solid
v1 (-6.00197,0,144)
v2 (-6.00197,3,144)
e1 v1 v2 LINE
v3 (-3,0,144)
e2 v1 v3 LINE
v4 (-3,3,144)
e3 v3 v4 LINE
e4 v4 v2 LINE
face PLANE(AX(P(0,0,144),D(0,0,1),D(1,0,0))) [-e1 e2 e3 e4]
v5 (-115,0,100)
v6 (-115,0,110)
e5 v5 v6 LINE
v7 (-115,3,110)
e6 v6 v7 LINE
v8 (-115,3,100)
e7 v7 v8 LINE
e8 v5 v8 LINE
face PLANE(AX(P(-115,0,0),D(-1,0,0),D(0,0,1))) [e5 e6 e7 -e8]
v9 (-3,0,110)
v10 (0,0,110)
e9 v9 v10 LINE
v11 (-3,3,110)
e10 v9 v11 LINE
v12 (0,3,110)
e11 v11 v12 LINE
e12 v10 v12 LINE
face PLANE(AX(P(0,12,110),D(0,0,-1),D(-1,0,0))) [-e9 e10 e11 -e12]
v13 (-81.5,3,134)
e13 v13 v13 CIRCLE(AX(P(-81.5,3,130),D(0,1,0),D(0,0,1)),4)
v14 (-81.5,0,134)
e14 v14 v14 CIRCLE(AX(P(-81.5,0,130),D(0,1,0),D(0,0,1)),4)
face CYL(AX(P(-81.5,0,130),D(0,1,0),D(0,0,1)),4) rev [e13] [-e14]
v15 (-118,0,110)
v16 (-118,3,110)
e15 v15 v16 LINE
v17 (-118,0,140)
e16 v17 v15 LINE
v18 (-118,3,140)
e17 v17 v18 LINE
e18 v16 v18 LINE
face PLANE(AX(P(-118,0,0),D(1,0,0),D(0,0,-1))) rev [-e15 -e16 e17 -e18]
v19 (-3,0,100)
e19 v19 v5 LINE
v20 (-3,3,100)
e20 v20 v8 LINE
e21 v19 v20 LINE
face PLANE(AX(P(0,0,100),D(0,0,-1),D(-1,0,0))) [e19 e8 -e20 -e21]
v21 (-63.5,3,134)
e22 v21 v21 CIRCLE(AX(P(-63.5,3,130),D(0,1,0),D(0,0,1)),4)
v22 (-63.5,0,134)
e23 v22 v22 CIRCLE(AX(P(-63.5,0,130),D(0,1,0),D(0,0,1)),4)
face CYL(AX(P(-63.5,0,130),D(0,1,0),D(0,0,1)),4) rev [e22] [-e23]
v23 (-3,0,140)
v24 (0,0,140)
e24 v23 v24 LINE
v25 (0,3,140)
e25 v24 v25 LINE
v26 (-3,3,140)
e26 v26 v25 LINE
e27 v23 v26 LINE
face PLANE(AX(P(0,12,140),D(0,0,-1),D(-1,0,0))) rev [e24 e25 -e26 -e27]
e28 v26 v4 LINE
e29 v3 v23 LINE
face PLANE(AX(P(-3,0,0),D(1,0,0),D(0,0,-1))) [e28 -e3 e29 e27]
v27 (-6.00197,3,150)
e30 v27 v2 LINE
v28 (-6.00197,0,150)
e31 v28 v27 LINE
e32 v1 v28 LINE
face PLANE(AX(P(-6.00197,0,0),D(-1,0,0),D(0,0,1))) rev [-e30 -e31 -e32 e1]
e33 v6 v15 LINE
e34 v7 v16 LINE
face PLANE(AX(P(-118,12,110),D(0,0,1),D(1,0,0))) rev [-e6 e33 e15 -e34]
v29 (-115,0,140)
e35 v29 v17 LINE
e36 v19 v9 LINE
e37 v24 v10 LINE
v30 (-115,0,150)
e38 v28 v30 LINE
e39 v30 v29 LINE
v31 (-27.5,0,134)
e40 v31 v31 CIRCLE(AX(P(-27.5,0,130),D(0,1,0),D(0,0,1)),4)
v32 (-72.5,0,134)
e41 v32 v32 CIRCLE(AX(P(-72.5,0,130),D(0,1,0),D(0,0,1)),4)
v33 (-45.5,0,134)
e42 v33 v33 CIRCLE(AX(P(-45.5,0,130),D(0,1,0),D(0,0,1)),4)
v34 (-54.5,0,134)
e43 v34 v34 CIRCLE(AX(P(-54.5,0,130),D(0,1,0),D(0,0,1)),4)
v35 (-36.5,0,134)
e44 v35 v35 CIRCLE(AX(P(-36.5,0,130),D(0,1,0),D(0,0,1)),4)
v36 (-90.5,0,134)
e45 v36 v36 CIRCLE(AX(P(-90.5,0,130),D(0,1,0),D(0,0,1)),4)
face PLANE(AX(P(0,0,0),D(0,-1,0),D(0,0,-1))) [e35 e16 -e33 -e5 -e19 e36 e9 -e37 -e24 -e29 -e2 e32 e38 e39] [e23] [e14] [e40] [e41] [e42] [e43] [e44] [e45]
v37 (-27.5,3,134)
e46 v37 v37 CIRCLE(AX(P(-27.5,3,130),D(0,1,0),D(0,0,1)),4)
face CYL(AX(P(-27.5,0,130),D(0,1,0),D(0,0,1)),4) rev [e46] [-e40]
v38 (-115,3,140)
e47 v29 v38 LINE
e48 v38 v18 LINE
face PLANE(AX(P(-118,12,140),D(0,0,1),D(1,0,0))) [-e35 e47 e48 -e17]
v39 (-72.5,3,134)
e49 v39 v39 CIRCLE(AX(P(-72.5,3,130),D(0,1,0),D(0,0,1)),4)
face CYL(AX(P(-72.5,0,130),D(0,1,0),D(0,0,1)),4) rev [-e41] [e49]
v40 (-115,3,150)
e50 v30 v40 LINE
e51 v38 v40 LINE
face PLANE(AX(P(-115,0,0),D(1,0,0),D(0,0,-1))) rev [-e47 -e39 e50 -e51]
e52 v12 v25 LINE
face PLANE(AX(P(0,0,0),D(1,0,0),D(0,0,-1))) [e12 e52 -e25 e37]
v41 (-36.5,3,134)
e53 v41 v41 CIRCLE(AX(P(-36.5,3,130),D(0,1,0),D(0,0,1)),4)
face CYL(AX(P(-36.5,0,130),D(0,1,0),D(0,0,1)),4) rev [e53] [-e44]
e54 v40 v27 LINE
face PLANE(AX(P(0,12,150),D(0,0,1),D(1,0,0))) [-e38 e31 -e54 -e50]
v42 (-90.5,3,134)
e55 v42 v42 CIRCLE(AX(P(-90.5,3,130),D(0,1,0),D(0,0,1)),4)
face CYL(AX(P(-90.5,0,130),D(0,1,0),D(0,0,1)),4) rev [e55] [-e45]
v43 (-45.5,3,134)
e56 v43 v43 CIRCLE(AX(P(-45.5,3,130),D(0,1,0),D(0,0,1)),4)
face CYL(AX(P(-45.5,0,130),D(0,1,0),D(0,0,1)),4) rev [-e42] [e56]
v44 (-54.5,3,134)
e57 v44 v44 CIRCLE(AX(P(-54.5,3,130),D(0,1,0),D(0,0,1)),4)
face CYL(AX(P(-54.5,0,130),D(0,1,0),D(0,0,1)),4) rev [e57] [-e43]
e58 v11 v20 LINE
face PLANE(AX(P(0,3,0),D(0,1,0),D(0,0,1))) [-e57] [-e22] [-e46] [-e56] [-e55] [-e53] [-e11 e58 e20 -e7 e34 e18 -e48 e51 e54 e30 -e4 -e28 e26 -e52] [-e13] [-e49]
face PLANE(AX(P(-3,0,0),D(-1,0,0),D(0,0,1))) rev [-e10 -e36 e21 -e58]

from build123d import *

# Parameters (mm, degrees)
LED_1_OUTLINE_R     = 2.25
LED_1_DEPTH         = 3
SKETCH_1_R          = 4
CUT_EXTRUDE_1_DEPTH = 3


# Read off the part's stored shape, not the designer's step: 基体零件-LED板-1
with BuildPart() as part:
    # 基体零件-LED板-1 outline → 基体零件-LED板-1 (new body)
    with BuildSketch(Plane(origin=(0, 0, 0), x_dir=(1, 0, 0), z_dir=(0, 1, 0))):
        Polygon((-3, -140), (0, -140), (0, -110), (-3, -110), (-3, -100), (-115, -100), (-115, -110), (-118, -110), (-118, -140), (-115, -140), (-115, -150), (-6.001970153, -150), (-6.001970153, -144), (-3, -144), align=None)
        with Locations((-90.5, -130)):
            Circle(LED_1_OUTLINE_R, mode=Mode.SUBTRACT)
        with Locations((-81.5, -130)):
            Circle(LED_1_OUTLINE_R, mode=Mode.SUBTRACT)
        with Locations((-72.5, -130)):
            Circle(LED_1_OUTLINE_R, mode=Mode.SUBTRACT)
        with Locations((-63.5, -130)):
            Circle(LED_1_OUTLINE_R, mode=Mode.SUBTRACT)
        with Locations((-54.5, -130)):
            Circle(LED_1_OUTLINE_R, mode=Mode.SUBTRACT)
        with Locations((-45.5, -130)):
            Circle(LED_1_OUTLINE_R, mode=Mode.SUBTRACT)
        with Locations((-36.5, -130)):
            Circle(LED_1_OUTLINE_R, mode=Mode.SUBTRACT)
        with Locations((-27.5, -130)):
            Circle(LED_1_OUTLINE_R, mode=Mode.SUBTRACT)
    extrude(amount=LED_1_DEPTH)

    # 草图1 → 切除-拉伸1 (cut)
    with BuildSketch(Plane(origin=(0, 3, 0), x_dir=(1, 0, 0), z_dir=(0, 1, 0))):
        with Locations(Location((-90.5, -130, 0), (0, 0, 270))):
            Circle(SKETCH_1_R)
        with Locations(Location((-81.5, -130, 0), (0, 0, 270))):
            Circle(SKETCH_1_R)
        with Locations(Location((-72.5, -130, 0), (0, 0, 270))):
            Circle(SKETCH_1_R)
        with Locations(Location((-63.5, -130, 0), (0, 0, 270))):
            Circle(SKETCH_1_R)
        with Locations(Location((-54.5, -130, 0), (0, 0, 270))):
            Circle(SKETCH_1_R)
        with Locations(Location((-45.5, -130, 0), (0, 0, 270))):
            Circle(SKETCH_1_R)
        with Locations(Location((-36.5, -130, 0), (0, 0, 270))):
            Circle(SKETCH_1_R)
        with Locations(Location((-27.5, -130, 0), (0, 0, 270))):
            Circle(SKETCH_1_R)
    extrude(amount=-CUT_EXTRUDE_1_DEPTH, mode=Mode.SUBTRACT)


solid = part.part
